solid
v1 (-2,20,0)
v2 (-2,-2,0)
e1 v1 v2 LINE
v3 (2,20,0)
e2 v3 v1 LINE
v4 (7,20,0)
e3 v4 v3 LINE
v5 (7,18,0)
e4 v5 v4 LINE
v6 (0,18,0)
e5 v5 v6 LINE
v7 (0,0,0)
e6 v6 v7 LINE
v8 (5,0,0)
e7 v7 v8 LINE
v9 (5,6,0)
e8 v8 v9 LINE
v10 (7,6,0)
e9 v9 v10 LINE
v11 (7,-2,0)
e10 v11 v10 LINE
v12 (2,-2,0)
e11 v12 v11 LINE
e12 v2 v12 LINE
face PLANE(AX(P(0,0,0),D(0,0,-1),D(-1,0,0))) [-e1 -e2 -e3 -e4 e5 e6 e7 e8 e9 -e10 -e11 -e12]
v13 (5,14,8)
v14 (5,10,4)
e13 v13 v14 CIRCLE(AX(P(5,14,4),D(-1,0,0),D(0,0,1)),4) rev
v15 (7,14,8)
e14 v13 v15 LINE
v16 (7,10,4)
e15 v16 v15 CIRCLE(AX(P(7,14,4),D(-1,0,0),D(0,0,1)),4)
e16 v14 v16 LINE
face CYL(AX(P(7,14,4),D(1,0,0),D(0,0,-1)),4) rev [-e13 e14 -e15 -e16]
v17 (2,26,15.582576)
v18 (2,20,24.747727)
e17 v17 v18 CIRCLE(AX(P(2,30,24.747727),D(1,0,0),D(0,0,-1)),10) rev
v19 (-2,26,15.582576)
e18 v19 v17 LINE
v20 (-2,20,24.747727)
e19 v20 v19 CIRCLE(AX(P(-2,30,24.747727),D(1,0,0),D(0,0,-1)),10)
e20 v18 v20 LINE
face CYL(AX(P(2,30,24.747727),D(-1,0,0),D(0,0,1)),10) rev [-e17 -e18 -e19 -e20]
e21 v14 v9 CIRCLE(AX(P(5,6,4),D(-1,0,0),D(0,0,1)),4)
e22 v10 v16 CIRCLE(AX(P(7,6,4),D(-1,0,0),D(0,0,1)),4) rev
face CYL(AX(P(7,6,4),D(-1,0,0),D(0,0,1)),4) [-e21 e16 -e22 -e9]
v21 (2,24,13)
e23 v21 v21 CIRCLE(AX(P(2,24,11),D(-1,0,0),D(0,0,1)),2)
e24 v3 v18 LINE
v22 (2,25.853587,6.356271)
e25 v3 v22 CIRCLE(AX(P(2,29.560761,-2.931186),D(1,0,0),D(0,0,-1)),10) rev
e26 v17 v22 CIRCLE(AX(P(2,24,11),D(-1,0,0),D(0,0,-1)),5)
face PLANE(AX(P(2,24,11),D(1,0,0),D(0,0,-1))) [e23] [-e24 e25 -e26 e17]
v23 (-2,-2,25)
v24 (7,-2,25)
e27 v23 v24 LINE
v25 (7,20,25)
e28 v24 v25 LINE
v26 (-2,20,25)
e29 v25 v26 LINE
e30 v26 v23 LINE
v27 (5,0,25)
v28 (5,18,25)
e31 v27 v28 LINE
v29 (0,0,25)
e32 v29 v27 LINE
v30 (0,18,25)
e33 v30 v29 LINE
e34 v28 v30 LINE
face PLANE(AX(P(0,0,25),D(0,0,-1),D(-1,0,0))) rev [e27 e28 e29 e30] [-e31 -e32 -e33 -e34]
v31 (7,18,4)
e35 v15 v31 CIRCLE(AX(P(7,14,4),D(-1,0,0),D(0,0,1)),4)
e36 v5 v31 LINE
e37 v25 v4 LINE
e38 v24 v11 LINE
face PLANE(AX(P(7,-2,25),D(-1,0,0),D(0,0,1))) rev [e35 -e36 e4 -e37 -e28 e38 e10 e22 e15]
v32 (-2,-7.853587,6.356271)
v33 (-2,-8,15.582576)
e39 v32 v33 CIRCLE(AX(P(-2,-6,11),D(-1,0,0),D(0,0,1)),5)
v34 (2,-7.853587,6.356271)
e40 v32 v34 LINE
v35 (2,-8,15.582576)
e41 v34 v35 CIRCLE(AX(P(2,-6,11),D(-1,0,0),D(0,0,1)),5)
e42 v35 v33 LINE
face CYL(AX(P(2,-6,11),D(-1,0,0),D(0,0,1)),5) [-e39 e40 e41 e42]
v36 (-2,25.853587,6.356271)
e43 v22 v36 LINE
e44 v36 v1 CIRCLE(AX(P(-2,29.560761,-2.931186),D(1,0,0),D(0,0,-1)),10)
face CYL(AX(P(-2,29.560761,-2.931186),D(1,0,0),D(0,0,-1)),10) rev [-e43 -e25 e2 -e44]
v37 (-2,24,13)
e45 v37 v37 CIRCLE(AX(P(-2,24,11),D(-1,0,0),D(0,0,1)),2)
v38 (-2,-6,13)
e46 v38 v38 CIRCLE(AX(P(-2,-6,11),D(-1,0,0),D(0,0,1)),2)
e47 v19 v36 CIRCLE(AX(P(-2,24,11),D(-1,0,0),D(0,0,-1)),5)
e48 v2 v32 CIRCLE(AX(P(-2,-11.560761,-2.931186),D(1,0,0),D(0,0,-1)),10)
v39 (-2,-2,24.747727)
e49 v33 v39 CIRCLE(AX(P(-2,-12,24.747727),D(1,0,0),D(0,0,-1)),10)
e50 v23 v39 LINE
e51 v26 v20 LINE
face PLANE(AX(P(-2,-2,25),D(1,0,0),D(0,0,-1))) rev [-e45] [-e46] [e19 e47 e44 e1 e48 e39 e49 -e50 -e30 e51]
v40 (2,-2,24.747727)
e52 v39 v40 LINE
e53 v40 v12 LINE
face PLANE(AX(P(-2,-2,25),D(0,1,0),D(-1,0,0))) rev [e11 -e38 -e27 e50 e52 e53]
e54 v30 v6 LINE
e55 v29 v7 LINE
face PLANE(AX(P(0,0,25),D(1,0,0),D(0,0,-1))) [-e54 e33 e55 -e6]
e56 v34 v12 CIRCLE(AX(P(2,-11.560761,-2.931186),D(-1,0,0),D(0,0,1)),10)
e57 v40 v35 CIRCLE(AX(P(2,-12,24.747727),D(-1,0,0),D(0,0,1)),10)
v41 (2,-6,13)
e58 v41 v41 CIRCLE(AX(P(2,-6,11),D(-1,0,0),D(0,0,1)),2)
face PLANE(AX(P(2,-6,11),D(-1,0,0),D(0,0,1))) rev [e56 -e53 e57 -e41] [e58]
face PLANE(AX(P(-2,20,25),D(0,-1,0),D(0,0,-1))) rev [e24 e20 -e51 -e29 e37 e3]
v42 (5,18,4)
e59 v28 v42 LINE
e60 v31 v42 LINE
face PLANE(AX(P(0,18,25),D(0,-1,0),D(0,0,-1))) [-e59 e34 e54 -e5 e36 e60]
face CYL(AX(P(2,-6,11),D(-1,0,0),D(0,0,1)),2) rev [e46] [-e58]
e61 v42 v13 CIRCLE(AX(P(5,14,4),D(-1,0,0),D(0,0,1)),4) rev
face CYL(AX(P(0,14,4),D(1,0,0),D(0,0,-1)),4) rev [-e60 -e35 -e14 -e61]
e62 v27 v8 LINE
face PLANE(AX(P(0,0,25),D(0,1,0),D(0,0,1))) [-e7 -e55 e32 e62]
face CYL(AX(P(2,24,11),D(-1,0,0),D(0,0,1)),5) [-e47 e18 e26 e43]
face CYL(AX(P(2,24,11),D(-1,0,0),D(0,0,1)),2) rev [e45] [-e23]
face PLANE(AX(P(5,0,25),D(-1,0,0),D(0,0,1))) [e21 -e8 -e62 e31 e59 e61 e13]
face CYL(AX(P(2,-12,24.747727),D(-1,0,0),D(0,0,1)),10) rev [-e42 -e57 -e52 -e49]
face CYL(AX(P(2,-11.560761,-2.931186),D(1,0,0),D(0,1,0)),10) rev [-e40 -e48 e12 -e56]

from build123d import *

# Parameters (mm, degrees)
ESQUISSE1_W             = 9
ESQUISSE1_H             = 22
ESQUISSE1_W_2           = 5
ESQUISSE1_H_2           = 18
BOSS_EXTRU_1_DEPTH      = 25
ESQUISSE2_R             = 2
BOSS_EXTRU_2_DEPTH      = 4
CONG_1_R                = 10
ESQUISSE3_W             = 8
ESQUISSE3_H             = 8
ENL_V_MAT_EXTRU_1_DEPTH = 39.923000912
CONG_2_R                = 4


# Some blends are built 0.0001 mm under size
with BuildPart() as part:
    # Esquisse1 → Boss.-Extru.1 (new body)
    with BuildSketch(Plane.XY):
        with Locations((2.5, 9)):
            Rectangle(ESQUISSE1_W, ESQUISSE1_H)
        with Locations((2.5, 9)):
            Rectangle(ESQUISSE1_W_2, ESQUISSE1_H_2, mode=Mode.SUBTRACT)
    extrude(amount=BOSS_EXTRU_1_DEPTH)

    # Esquisse2 → Boss.-Extru.2 (add)
    # profile 1 of 2: a face of its own
    with BuildSketch(Plane.ZY.offset(2)):
        with BuildLine():
            Line((6, -2), (6, -6))
            ThreePointArc((6, -6), (11, -11), (16, -6))
            Line((16, -6), (16, -2))
            Line((16, -2), (6, -2))
        make_face()
        with Locations((11, -6)):
            Circle(ESQUISSE2_R, mode=Mode.SUBTRACT)
    # profile 2 of 2: a face of its own
    with BuildSketch(Plane.ZY.offset(2)):
        with BuildLine():
            Line((6, 20), (6, 24))
            ThreePointArc((6, 24), (11, 29), (16, 24))
            Line((16, 24), (16, 20))
            Line((16, 20), (6, 20))
        make_face()
        with Locations((11, 24)):
            Circle(ESQUISSE2_R, mode=Mode.SUBTRACT)
    extrude(amount=-BOSS_EXTRU_2_DEPTH)

    # Congé1
    # the kernel refuses this fillet: 10 mm, written as the material it adds along each edge
    with BuildSketch(Plane(origin=(-2, -2, 16), x_dir=(0, 0, 1), z_dir=(1, 0, 0))) as cong_1_piece_1:
        with BuildLine():
            CenterArc((8.747727085, 10), CONG_1_R, 203.578178478, 66.421821522)
            Line((-0.417424305, 6), (-1.333939444, 5.6))
            ThreePointArc((-1.333939444, 5.6), (-1, 4), (-1, 0))
            Line((-1, 0), (0, -1))
            Line((0, -1), (8.747727085, -1))
            Line((8.747727085, -1), (8.747727085, 0))
        make_face()
    extrude(amount=4)
    with BuildSketch(Plane(origin=(-2, 20, 16), x_dir=(0, 0, 1), z_dir=(1, 0, 0))) as cong_1_piece_2:
        with BuildLine():
            CenterArc((8.747727085, -10), CONG_1_R, 90, 66.421821522)
            Line((-0.417424305, -6), (-1.333939444, -5.6))
            ThreePointArc((-1.333939444, -5.6), (-1, -4), (-1, 0))
            Line((-1, 0), (0, 1))
            Line((0, 1), (8.747727085, 1))
            Line((8.747727085, 1), (8.747727085, 0))
        make_face()
    extrude(amount=4)
    with BuildSketch(Plane(origin=(-2, -2, 6), x_dir=(0, 0, -1), z_dir=(1, 0, 0))) as cong_1_piece_3:
        with BuildLine():
            CenterArc((8.931185798, -9.560760944), CONG_1_R, 107.044753414, 51.195378821)
            Line((-0.356271401, -5.853586981), (-1.285017121, -5.482869585))
            ThreePointArc((-1.285017121, -5.482869585), (-1, -4), (-1, 0))
            Line((-1, 0), (0, 1))
            ThreePointArc((0, 1), (3, 1), (5.70688142, 0.956076094))
            Line((5.70688142, 0.956076094), (6, 0))
        make_face()
    extrude(amount=4)
    with BuildSketch(Plane(origin=(-2, 20, 6), x_dir=(0, 0, -1), z_dir=(1, 0, 0))) as cong_1_piece_4:
        with BuildLine():
            CenterArc((8.931185798, 9.560760944), CONG_1_R, 201.759867765, 51.195378821)
            Line((-0.356271401, 5.853586981), (-1.285017121, 5.482869585))
            ThreePointArc((-1.285017121, 5.482869585), (-1, 4), (-1, 0))
            Line((-1, 0), (0, -1))
            ThreePointArc((0, -1), (3, -1), (5.70688142, -0.956076094))
            Line((5.70688142, -0.956076094), (6, 0))
        make_face()
    extrude(amount=4)

    # Esquisse3 → Enlèv. mat.-Extru.1 (cut, through all)
    with BuildSketch(Plane(origin=(0, 0, 0), x_dir=(0, 0, -1), z_dir=(1, 0, 0))):
        with Locations((-4, 14)):
            Rectangle(ESQUISSE3_W, ESQUISSE3_H)
    extrude(amount=ENL_V_MAT_EXTRU_1_DEPTH, mode=Mode.SUBTRACT)

    # Congé2
    cong_2_edges = [part.edges().sort_by_distance(p)[0] for p in [
        (6, 10, 0),
        (6, 10, 8),
        (6, 18, 8),
    ]]
    fillet(cong_2_edges, radius=CONG_2_R - 0.0001)  # a hair under: the kernel refuses the full size


solid = part.part
